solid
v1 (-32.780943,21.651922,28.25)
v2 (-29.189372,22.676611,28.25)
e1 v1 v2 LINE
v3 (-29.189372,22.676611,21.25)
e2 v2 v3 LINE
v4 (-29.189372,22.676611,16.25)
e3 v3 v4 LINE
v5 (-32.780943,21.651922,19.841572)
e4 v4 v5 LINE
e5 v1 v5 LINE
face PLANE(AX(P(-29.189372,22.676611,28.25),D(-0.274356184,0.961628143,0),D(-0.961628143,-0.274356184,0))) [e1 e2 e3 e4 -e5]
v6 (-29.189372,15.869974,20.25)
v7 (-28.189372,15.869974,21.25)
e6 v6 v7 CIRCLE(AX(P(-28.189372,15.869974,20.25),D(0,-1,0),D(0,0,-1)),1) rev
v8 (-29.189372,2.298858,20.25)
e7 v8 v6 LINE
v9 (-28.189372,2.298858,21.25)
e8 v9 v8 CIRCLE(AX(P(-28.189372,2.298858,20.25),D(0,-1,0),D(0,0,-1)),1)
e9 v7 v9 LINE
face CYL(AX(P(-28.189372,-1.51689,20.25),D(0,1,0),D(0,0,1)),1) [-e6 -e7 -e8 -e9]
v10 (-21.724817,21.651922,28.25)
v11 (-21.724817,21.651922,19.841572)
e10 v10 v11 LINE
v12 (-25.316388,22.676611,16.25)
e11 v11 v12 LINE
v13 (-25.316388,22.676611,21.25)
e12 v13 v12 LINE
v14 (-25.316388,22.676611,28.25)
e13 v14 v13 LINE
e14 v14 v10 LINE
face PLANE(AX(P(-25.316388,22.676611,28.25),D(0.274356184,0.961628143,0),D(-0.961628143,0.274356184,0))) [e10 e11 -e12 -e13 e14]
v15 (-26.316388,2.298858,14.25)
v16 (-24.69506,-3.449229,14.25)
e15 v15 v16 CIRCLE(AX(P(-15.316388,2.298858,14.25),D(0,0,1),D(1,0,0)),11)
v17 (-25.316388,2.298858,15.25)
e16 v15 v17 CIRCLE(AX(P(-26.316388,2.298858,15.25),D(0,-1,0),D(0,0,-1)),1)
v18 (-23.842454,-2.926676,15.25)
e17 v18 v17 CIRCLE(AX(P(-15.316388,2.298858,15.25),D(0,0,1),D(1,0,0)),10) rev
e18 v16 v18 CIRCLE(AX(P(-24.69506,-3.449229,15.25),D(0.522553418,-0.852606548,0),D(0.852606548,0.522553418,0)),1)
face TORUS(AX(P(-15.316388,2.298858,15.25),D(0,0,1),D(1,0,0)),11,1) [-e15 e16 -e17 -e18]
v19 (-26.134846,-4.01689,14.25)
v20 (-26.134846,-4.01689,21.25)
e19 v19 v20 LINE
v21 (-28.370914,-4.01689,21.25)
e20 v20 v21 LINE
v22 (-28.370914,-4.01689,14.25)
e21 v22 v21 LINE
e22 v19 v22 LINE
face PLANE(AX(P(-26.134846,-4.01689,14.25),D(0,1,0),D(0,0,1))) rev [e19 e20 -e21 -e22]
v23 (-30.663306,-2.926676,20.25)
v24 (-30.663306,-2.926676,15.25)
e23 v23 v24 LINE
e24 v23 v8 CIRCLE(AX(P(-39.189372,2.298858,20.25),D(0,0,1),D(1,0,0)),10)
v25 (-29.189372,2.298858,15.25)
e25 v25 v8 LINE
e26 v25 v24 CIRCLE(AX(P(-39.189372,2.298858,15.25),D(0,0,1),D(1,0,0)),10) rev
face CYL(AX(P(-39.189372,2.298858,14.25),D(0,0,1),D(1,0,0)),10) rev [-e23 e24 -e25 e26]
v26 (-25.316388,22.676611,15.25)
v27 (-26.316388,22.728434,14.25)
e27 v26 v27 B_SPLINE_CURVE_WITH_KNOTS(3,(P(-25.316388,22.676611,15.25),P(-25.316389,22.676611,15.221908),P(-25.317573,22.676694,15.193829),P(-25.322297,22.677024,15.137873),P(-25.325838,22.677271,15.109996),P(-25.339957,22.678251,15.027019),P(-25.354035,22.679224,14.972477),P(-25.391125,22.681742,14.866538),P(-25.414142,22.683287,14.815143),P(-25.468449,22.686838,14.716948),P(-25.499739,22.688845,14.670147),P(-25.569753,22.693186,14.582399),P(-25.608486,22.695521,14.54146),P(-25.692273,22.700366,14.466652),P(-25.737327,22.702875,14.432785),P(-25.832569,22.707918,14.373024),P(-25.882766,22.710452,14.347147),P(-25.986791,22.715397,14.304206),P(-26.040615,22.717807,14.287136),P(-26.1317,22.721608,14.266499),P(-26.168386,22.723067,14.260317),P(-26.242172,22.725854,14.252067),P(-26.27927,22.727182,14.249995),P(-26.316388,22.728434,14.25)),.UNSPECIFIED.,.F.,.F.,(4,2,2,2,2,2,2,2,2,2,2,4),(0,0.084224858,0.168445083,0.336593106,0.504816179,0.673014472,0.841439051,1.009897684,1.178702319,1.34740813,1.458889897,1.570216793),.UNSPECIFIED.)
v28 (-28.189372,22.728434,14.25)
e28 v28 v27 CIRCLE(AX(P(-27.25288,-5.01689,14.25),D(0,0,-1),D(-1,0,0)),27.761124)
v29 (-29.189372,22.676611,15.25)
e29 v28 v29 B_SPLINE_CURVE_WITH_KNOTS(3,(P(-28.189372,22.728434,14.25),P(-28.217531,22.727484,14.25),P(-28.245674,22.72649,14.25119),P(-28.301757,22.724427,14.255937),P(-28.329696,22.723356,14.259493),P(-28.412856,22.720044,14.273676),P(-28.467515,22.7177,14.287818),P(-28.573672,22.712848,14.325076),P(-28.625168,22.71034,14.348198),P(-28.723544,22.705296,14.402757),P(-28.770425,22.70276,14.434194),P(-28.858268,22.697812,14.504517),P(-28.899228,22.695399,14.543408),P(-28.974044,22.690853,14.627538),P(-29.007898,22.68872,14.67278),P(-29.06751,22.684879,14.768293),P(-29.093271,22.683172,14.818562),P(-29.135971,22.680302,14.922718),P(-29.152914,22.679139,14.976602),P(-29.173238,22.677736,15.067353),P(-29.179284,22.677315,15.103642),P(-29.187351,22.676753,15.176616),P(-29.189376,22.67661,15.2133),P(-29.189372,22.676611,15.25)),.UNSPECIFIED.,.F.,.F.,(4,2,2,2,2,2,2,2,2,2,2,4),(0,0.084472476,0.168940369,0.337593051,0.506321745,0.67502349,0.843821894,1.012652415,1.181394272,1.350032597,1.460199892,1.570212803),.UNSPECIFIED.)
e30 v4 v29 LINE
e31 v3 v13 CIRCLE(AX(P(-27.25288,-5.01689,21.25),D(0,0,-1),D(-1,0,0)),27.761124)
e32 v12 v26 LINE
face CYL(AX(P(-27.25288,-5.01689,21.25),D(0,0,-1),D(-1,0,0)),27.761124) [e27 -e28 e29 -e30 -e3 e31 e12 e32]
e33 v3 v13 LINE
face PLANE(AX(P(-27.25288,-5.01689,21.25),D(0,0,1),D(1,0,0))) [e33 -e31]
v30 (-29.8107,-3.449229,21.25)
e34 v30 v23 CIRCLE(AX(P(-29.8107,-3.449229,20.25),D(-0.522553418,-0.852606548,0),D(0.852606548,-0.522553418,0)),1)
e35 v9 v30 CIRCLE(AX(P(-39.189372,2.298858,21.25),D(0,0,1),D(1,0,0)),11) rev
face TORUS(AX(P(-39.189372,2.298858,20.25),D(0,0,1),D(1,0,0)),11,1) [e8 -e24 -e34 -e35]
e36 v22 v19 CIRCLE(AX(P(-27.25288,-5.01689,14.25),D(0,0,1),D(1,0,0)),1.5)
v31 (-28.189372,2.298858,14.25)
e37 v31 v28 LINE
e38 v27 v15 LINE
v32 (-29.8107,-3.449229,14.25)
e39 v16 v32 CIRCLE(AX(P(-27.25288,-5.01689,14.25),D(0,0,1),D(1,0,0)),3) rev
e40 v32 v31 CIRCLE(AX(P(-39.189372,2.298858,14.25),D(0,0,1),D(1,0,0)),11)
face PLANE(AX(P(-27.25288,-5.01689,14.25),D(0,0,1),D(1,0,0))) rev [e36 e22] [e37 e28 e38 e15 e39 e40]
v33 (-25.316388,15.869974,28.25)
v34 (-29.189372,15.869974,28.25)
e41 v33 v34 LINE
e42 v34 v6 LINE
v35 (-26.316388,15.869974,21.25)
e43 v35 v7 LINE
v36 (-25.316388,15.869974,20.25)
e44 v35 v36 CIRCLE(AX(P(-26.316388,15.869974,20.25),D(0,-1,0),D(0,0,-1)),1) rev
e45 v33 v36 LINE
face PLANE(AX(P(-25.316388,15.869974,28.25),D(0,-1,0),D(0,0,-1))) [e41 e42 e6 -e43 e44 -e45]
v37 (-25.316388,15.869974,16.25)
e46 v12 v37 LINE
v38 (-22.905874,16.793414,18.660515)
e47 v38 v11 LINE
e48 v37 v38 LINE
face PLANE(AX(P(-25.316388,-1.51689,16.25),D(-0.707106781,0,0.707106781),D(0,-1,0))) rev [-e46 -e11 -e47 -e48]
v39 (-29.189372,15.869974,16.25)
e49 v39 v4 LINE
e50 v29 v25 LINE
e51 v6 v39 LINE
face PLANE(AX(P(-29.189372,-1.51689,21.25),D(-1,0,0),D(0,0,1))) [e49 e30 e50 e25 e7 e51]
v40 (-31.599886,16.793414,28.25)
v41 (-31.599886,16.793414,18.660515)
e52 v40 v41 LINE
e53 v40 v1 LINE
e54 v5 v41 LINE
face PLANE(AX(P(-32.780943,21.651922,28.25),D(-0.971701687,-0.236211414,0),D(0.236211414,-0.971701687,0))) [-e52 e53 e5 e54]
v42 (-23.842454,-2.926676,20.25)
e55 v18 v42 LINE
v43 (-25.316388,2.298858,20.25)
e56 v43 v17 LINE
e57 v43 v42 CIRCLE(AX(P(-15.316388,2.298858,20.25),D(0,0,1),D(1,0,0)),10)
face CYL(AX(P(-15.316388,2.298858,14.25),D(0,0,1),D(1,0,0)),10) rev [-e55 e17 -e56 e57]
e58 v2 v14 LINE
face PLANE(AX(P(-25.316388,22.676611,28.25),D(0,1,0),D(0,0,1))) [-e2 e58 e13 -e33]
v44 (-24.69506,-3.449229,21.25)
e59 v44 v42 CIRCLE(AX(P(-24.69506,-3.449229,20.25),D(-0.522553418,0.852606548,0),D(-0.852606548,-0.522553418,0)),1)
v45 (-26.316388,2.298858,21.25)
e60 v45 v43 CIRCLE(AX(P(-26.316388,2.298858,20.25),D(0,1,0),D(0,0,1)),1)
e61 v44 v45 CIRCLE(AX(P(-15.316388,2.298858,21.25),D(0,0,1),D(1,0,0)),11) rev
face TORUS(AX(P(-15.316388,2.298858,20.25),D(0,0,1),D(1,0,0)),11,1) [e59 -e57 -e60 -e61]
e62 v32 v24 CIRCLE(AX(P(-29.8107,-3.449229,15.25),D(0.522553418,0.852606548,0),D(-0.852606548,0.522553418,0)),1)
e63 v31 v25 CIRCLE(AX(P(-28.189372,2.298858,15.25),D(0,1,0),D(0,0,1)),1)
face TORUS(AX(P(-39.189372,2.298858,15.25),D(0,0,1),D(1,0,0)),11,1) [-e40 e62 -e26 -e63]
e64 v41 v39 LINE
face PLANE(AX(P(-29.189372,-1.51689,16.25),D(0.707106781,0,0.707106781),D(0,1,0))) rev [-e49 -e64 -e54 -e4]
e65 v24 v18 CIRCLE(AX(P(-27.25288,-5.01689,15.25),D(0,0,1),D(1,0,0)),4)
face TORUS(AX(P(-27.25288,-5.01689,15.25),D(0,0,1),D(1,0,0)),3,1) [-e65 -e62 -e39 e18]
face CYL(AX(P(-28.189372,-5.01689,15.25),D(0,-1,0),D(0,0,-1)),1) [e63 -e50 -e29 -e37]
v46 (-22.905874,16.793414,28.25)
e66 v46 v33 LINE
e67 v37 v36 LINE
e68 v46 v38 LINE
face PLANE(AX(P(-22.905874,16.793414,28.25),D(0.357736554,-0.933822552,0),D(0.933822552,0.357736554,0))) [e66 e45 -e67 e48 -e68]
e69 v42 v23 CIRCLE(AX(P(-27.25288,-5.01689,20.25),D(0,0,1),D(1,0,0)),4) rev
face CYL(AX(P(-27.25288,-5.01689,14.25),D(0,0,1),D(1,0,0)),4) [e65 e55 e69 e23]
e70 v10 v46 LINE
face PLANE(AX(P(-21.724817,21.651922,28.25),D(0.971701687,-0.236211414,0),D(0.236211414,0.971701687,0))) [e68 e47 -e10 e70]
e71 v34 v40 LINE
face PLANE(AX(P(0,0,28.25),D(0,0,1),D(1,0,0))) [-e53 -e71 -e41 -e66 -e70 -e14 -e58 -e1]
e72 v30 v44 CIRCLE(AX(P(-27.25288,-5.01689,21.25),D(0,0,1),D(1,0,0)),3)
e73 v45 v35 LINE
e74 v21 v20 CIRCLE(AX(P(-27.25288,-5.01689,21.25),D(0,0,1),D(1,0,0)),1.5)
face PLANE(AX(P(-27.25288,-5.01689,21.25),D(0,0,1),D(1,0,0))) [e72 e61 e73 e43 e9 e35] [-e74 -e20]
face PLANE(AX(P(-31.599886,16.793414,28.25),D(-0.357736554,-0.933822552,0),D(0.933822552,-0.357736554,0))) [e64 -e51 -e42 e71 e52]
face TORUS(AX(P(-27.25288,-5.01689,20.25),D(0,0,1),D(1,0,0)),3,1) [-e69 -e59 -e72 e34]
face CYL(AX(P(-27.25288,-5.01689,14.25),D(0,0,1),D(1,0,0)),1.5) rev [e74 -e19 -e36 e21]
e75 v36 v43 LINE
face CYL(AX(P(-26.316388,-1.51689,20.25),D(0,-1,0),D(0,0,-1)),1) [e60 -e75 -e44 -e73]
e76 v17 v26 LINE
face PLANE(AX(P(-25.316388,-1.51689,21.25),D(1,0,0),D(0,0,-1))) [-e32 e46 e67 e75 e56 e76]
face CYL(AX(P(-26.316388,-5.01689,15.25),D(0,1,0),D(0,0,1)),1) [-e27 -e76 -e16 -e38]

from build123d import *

# Parameters (mm, degrees)
SALIENTE_EXTRUIR1_DEPTH = 7
SALIENTE_EXTRUIR2_DEPTH = 7
SALIENTE_EXTRUIR3_DEPTH = 7
REDONDEO1_R             = 10
REDONDEO2_R             = 1
REDONDEO3_R             = 1
CHAFL_N1_SIZE           = 5


with BuildPart() as part:
    # Croquis1 → Saliente-Extruir1 (new body)
    with BuildSketch(Plane.XY.offset(21.250000099)):
        with BuildLine():
            Line((-25.316388353, -1.516889614), (-29.189371699, -1.516889614))
            ThreePointArc((-29.189371699, -1.516889614), (-27.252880026, -9.016889614), (-25.316388353, -1.516889614))
        make_face()
        with BuildLine():
            Line((-26.134846038, -4.016889614), (-28.370914015, -4.016889614))
            ThreePointArc((-28.370914015, -4.016889614), (-27.252880026, -6.516889614), (-26.134846038, -4.016889614))
        make_face(mode=Mode.SUBTRACT)
    extrude(amount=-SALIENTE_EXTRUIR1_DEPTH)

    # Croquis2 → Saliente-Extruir2 (add)
    with BuildSketch(Plane(origin=(0, 0, 14.250000099), x_dir=(-1, 0, 0), z_dir=(0, 0, -1))):
        with BuildLine():
            Line((25.316388353, -1.516889614), (25.316388353, 22.676611236))
            ThreePointArc((25.316388353, 22.676611236), (27.252880026, 22.744234091), (29.189371699, 22.676611236))
            Line((29.189371699, 22.676611236), (29.189371699, -1.516889614))
            Line((29.189371699, -1.516889614), (25.316388353, -1.516889614))
        make_face()
    extrude(amount=-SALIENTE_EXTRUIR2_DEPTH)

    # Croquis3 → Saliente-Extruir3 (add)
    with BuildSketch(Plane(origin=(0, 0, 21.250000099), x_dir=(-1, 0, 0), z_dir=(0, 0, -1))):
        Polygon((25.316388353, 22.676611236), (21.724816583, 21.651922087), (22.905873651, 16.793413653), (25.316388353, 15.869973518), (29.189371699, 15.869973518), (31.599886401, 16.793413653), (32.780943469, 21.651922087), (29.189371699, 22.676611236), align=None)
    extrude(amount=-SALIENTE_EXTRUIR3_DEPTH)

    # Redondeo1
    redondeo1_edges = [part.edges().sort_by_distance(p)[0] for p in [
        (-29.189371699, -1.516889614, 17.750000099),
        (-25.316388353, -1.516889614, 17.750000099),
    ]]
    fillet(redondeo1_edges, radius=REDONDEO1_R)

    # Redondeo2
    redondeo2_edges = [part.edges().sort_by_distance(p)[0] for p in [
        (-25.316388353, 12.487734734, 14.250000099),
        (-29.189371699, 12.487734734, 14.250000099),
        (-27.252880026, -9.016889614, 14.250000099),
        (-29.564906654, -0.415855859, 14.250000099),
        (-24.940853398, -0.415855859, 14.250000099),
    ]]
    fillet(redondeo2_edges, radius=REDONDEO2_R)

    # Redondeo3
    # the kernel refuses this fillet: 1 mm, written as the material it takes off along each edge
    with BuildSketch(Plane(origin=(-25.316388353, 2.298858232, 21.250000099), x_dir=(-1, 0, 0), z_dir=(0, 1, 0)), Plane(origin=(-29.189371699, 15.869973518, 21.250000099), x_dir=(1, 0, 0), z_dir=(0, -1, 0))) as redondeo3_piece_1:
        with BuildLine():
            CenterArc((REDONDEO3_R, -REDONDEO3_R), REDONDEO3_R, 90, 90)
            Line((0, -REDONDEO3_R), (0, 0))
            Line((0, 0), (REDONDEO3_R, 0))
        make_face()
    extrude(amount=13.571115286, mode=Mode.SUBTRACT)
    with BuildSketch(Plane(origin=(-27.252880026, -5.016889614, 21.250000099), x_dir=(-0.8526065480788361, 0.5225534175307739, 0), z_dir=(0.5225534175307739, 0.8526065480788361, 0))) as redondeo3_piece_2:
        with BuildLine():
            CenterArc((4 - REDONDEO3_R, -REDONDEO3_R), REDONDEO3_R, 0, 90)
            Line((4 - REDONDEO3_R, 0), (4, 0))
            Line((4, 0), (4, -REDONDEO3_R))
        make_face()
    revolve(axis=Axis((-27.252880026, -5.016889614, 21.250000099), (0, 0, 1)), revolution_arc=243.007372153, mode=Mode.SUBTRACT)
    with BuildSketch(Plane(origin=(-39.189371699, 2.298858232, 21.250000099), x_dir=(0.8526065480788363, -0.5225534175307737, 0), z_dir=(-0.5225534175307737, -0.8526065480788363, 0))) as redondeo3_piece_3:
        with BuildLine():
            CenterArc((10 + REDONDEO3_R, -REDONDEO3_R), REDONDEO3_R, 90, 90)
            Line((10 + REDONDEO3_R, 0), (10, 0))
            Line((10, 0), (10, -REDONDEO3_R))
        make_face()
    revolve(axis=Axis((-39.189371699, 2.298858232, 21.250000099), (0, 0, 1)), revolution_arc=31.503686076, mode=Mode.SUBTRACT)
    with BuildSketch(Plane(origin=(-15.316388353, 2.298858232, 21.250000099), x_dir=(-0.8526065480788363, -0.5225534175307737, 0), z_dir=(0.5225534175307737, -0.8526065480788363, 0))) as redondeo3_piece_4:
        with BuildLine():
            CenterArc((10 + REDONDEO3_R, REDONDEO3_R), REDONDEO3_R, 180, 90)
            Line((10, REDONDEO3_R), (10, 0))
            Line((10, 0), (10 + REDONDEO3_R, 0))
        make_face()
    revolve(axis=Axis((-15.316388353, 2.298858232, 21.250000099), (0, 0, -1)), revolution_arc=31.503686076, mode=Mode.SUBTRACT)

    # Chaflán1
    # the kernel refuses this chamfer: 5 mm, written as the material it adds along each edge
    with BuildSketch(Plane(origin=(-25.316388353, 3.011558578, 21.250000099), x_dir=(-0.027495876610586317, 0, -0.9996219169112968), z_dir=(0, 1, 0))) as chafl_n1_piece_1_section:
        Polygon((CHAFL_N1_SIZE * 0.999621916911, -CHAFL_N1_SIZE * 0.0274958766106), (-CHAFL_N1_SIZE * 0.0274958766106, -CHAFL_N1_SIZE * 0.999621916911), (0, 0), align=None)
    chafl_n1_piece_1 = extrude(amount=32.523467598, mode=Mode.PRIVATE)
    chafl_n1_piece_1 = chafl_n1_piece_1 & Plane(origin=(-27.252880026, -5.016889614, 17.716506235), x_dir=(0.06975552192119414, 0.997564116817311, 0), z_dir=(0, 0, -1)) * Cylinder(27.761123704, 86, mode=Mode.PRIVATE)
    chafl_n1_piece_1 = split(chafl_n1_piece_1, bisect_by=Plane(origin=(-25.415963135, 15.831827578, 17.716506235), z_dir=(-0.35773655396653403, 0.9338225516425211, 0)), keep=Keep.TOP, mode=Mode.PRIVATE)
    chafl_n1_piece_1 = split(chafl_n1_piece_1, bisect_by=Plane(origin=(-23.262937497, 15.32456193, 17.716506235), z_dir=(-0.9717016867786622, 0.23621141359278705, 0)), keep=Keep.TOP, mode=Mode.PRIVATE)
    chafl_n1_piece_1 = split(chafl_n1_piece_1, bisect_by=Plane(origin=(-23.613600886, 22.190799465, 17.716506235), z_dir=(-0.2743561835557756, -0.9616281425502842, 0)), keep=Keep.TOP, mode=Mode.PRIVATE)
    add(chafl_n1_piece_1)
    with BuildSketch(Plane(origin=(-29.189371699, 35.535026176, 21.250000099), x_dir=(0.027495876610586317, 0, -0.9996219169112968), z_dir=(0, -1, 0))) as chafl_n1_piece_2_section:
        Polygon((CHAFL_N1_SIZE * 0.999621916911, -CHAFL_N1_SIZE * 0.0274958766106), (-CHAFL_N1_SIZE * 0.0274958766106, -CHAFL_N1_SIZE * 0.999621916911), (0, 0), align=None)
    chafl_n1_piece_2 = extrude(amount=32.523467598, mode=Mode.PRIVATE)
    chafl_n1_piece_2 = chafl_n1_piece_2 & Plane(origin=(-27.252880026, -5.016889614, 19.332721103), x_dir=(0.06975552192119414, 0.997564116817311, 0), z_dir=(0, 0, -1)) * Cylinder(27.761123704, 86, mode=Mode.PRIVATE)
    chafl_n1_piece_2 = split(chafl_n1_piece_2, bisect_by=Plane(origin=(-31.36247481, 16.702464034, 19.332721103), z_dir=(0.35773655396653403, 0.9338225516425211, 0)), keep=Keep.TOP, mode=Mode.PRIVATE)
    chafl_n1_piece_2 = split(chafl_n1_piece_2, bisect_by=Plane(origin=(-31.108304124, 22.129132483, 19.332721103), z_dir=(0.2743561835557751, -0.9616281425502844, 0)), keep=Keep.TOP, mode=Mode.PRIVATE)
    chafl_n1_piece_2 = split(chafl_n1_piece_2, bisect_by=Plane(origin=(-32.12707836, 18.962120521, 19.332721103), z_dir=(0.9717016867786619, 0.2362114135927884, 0)), keep=Keep.TOP, mode=Mode.PRIVATE)
    add(chafl_n1_piece_2)


solid = part.part
